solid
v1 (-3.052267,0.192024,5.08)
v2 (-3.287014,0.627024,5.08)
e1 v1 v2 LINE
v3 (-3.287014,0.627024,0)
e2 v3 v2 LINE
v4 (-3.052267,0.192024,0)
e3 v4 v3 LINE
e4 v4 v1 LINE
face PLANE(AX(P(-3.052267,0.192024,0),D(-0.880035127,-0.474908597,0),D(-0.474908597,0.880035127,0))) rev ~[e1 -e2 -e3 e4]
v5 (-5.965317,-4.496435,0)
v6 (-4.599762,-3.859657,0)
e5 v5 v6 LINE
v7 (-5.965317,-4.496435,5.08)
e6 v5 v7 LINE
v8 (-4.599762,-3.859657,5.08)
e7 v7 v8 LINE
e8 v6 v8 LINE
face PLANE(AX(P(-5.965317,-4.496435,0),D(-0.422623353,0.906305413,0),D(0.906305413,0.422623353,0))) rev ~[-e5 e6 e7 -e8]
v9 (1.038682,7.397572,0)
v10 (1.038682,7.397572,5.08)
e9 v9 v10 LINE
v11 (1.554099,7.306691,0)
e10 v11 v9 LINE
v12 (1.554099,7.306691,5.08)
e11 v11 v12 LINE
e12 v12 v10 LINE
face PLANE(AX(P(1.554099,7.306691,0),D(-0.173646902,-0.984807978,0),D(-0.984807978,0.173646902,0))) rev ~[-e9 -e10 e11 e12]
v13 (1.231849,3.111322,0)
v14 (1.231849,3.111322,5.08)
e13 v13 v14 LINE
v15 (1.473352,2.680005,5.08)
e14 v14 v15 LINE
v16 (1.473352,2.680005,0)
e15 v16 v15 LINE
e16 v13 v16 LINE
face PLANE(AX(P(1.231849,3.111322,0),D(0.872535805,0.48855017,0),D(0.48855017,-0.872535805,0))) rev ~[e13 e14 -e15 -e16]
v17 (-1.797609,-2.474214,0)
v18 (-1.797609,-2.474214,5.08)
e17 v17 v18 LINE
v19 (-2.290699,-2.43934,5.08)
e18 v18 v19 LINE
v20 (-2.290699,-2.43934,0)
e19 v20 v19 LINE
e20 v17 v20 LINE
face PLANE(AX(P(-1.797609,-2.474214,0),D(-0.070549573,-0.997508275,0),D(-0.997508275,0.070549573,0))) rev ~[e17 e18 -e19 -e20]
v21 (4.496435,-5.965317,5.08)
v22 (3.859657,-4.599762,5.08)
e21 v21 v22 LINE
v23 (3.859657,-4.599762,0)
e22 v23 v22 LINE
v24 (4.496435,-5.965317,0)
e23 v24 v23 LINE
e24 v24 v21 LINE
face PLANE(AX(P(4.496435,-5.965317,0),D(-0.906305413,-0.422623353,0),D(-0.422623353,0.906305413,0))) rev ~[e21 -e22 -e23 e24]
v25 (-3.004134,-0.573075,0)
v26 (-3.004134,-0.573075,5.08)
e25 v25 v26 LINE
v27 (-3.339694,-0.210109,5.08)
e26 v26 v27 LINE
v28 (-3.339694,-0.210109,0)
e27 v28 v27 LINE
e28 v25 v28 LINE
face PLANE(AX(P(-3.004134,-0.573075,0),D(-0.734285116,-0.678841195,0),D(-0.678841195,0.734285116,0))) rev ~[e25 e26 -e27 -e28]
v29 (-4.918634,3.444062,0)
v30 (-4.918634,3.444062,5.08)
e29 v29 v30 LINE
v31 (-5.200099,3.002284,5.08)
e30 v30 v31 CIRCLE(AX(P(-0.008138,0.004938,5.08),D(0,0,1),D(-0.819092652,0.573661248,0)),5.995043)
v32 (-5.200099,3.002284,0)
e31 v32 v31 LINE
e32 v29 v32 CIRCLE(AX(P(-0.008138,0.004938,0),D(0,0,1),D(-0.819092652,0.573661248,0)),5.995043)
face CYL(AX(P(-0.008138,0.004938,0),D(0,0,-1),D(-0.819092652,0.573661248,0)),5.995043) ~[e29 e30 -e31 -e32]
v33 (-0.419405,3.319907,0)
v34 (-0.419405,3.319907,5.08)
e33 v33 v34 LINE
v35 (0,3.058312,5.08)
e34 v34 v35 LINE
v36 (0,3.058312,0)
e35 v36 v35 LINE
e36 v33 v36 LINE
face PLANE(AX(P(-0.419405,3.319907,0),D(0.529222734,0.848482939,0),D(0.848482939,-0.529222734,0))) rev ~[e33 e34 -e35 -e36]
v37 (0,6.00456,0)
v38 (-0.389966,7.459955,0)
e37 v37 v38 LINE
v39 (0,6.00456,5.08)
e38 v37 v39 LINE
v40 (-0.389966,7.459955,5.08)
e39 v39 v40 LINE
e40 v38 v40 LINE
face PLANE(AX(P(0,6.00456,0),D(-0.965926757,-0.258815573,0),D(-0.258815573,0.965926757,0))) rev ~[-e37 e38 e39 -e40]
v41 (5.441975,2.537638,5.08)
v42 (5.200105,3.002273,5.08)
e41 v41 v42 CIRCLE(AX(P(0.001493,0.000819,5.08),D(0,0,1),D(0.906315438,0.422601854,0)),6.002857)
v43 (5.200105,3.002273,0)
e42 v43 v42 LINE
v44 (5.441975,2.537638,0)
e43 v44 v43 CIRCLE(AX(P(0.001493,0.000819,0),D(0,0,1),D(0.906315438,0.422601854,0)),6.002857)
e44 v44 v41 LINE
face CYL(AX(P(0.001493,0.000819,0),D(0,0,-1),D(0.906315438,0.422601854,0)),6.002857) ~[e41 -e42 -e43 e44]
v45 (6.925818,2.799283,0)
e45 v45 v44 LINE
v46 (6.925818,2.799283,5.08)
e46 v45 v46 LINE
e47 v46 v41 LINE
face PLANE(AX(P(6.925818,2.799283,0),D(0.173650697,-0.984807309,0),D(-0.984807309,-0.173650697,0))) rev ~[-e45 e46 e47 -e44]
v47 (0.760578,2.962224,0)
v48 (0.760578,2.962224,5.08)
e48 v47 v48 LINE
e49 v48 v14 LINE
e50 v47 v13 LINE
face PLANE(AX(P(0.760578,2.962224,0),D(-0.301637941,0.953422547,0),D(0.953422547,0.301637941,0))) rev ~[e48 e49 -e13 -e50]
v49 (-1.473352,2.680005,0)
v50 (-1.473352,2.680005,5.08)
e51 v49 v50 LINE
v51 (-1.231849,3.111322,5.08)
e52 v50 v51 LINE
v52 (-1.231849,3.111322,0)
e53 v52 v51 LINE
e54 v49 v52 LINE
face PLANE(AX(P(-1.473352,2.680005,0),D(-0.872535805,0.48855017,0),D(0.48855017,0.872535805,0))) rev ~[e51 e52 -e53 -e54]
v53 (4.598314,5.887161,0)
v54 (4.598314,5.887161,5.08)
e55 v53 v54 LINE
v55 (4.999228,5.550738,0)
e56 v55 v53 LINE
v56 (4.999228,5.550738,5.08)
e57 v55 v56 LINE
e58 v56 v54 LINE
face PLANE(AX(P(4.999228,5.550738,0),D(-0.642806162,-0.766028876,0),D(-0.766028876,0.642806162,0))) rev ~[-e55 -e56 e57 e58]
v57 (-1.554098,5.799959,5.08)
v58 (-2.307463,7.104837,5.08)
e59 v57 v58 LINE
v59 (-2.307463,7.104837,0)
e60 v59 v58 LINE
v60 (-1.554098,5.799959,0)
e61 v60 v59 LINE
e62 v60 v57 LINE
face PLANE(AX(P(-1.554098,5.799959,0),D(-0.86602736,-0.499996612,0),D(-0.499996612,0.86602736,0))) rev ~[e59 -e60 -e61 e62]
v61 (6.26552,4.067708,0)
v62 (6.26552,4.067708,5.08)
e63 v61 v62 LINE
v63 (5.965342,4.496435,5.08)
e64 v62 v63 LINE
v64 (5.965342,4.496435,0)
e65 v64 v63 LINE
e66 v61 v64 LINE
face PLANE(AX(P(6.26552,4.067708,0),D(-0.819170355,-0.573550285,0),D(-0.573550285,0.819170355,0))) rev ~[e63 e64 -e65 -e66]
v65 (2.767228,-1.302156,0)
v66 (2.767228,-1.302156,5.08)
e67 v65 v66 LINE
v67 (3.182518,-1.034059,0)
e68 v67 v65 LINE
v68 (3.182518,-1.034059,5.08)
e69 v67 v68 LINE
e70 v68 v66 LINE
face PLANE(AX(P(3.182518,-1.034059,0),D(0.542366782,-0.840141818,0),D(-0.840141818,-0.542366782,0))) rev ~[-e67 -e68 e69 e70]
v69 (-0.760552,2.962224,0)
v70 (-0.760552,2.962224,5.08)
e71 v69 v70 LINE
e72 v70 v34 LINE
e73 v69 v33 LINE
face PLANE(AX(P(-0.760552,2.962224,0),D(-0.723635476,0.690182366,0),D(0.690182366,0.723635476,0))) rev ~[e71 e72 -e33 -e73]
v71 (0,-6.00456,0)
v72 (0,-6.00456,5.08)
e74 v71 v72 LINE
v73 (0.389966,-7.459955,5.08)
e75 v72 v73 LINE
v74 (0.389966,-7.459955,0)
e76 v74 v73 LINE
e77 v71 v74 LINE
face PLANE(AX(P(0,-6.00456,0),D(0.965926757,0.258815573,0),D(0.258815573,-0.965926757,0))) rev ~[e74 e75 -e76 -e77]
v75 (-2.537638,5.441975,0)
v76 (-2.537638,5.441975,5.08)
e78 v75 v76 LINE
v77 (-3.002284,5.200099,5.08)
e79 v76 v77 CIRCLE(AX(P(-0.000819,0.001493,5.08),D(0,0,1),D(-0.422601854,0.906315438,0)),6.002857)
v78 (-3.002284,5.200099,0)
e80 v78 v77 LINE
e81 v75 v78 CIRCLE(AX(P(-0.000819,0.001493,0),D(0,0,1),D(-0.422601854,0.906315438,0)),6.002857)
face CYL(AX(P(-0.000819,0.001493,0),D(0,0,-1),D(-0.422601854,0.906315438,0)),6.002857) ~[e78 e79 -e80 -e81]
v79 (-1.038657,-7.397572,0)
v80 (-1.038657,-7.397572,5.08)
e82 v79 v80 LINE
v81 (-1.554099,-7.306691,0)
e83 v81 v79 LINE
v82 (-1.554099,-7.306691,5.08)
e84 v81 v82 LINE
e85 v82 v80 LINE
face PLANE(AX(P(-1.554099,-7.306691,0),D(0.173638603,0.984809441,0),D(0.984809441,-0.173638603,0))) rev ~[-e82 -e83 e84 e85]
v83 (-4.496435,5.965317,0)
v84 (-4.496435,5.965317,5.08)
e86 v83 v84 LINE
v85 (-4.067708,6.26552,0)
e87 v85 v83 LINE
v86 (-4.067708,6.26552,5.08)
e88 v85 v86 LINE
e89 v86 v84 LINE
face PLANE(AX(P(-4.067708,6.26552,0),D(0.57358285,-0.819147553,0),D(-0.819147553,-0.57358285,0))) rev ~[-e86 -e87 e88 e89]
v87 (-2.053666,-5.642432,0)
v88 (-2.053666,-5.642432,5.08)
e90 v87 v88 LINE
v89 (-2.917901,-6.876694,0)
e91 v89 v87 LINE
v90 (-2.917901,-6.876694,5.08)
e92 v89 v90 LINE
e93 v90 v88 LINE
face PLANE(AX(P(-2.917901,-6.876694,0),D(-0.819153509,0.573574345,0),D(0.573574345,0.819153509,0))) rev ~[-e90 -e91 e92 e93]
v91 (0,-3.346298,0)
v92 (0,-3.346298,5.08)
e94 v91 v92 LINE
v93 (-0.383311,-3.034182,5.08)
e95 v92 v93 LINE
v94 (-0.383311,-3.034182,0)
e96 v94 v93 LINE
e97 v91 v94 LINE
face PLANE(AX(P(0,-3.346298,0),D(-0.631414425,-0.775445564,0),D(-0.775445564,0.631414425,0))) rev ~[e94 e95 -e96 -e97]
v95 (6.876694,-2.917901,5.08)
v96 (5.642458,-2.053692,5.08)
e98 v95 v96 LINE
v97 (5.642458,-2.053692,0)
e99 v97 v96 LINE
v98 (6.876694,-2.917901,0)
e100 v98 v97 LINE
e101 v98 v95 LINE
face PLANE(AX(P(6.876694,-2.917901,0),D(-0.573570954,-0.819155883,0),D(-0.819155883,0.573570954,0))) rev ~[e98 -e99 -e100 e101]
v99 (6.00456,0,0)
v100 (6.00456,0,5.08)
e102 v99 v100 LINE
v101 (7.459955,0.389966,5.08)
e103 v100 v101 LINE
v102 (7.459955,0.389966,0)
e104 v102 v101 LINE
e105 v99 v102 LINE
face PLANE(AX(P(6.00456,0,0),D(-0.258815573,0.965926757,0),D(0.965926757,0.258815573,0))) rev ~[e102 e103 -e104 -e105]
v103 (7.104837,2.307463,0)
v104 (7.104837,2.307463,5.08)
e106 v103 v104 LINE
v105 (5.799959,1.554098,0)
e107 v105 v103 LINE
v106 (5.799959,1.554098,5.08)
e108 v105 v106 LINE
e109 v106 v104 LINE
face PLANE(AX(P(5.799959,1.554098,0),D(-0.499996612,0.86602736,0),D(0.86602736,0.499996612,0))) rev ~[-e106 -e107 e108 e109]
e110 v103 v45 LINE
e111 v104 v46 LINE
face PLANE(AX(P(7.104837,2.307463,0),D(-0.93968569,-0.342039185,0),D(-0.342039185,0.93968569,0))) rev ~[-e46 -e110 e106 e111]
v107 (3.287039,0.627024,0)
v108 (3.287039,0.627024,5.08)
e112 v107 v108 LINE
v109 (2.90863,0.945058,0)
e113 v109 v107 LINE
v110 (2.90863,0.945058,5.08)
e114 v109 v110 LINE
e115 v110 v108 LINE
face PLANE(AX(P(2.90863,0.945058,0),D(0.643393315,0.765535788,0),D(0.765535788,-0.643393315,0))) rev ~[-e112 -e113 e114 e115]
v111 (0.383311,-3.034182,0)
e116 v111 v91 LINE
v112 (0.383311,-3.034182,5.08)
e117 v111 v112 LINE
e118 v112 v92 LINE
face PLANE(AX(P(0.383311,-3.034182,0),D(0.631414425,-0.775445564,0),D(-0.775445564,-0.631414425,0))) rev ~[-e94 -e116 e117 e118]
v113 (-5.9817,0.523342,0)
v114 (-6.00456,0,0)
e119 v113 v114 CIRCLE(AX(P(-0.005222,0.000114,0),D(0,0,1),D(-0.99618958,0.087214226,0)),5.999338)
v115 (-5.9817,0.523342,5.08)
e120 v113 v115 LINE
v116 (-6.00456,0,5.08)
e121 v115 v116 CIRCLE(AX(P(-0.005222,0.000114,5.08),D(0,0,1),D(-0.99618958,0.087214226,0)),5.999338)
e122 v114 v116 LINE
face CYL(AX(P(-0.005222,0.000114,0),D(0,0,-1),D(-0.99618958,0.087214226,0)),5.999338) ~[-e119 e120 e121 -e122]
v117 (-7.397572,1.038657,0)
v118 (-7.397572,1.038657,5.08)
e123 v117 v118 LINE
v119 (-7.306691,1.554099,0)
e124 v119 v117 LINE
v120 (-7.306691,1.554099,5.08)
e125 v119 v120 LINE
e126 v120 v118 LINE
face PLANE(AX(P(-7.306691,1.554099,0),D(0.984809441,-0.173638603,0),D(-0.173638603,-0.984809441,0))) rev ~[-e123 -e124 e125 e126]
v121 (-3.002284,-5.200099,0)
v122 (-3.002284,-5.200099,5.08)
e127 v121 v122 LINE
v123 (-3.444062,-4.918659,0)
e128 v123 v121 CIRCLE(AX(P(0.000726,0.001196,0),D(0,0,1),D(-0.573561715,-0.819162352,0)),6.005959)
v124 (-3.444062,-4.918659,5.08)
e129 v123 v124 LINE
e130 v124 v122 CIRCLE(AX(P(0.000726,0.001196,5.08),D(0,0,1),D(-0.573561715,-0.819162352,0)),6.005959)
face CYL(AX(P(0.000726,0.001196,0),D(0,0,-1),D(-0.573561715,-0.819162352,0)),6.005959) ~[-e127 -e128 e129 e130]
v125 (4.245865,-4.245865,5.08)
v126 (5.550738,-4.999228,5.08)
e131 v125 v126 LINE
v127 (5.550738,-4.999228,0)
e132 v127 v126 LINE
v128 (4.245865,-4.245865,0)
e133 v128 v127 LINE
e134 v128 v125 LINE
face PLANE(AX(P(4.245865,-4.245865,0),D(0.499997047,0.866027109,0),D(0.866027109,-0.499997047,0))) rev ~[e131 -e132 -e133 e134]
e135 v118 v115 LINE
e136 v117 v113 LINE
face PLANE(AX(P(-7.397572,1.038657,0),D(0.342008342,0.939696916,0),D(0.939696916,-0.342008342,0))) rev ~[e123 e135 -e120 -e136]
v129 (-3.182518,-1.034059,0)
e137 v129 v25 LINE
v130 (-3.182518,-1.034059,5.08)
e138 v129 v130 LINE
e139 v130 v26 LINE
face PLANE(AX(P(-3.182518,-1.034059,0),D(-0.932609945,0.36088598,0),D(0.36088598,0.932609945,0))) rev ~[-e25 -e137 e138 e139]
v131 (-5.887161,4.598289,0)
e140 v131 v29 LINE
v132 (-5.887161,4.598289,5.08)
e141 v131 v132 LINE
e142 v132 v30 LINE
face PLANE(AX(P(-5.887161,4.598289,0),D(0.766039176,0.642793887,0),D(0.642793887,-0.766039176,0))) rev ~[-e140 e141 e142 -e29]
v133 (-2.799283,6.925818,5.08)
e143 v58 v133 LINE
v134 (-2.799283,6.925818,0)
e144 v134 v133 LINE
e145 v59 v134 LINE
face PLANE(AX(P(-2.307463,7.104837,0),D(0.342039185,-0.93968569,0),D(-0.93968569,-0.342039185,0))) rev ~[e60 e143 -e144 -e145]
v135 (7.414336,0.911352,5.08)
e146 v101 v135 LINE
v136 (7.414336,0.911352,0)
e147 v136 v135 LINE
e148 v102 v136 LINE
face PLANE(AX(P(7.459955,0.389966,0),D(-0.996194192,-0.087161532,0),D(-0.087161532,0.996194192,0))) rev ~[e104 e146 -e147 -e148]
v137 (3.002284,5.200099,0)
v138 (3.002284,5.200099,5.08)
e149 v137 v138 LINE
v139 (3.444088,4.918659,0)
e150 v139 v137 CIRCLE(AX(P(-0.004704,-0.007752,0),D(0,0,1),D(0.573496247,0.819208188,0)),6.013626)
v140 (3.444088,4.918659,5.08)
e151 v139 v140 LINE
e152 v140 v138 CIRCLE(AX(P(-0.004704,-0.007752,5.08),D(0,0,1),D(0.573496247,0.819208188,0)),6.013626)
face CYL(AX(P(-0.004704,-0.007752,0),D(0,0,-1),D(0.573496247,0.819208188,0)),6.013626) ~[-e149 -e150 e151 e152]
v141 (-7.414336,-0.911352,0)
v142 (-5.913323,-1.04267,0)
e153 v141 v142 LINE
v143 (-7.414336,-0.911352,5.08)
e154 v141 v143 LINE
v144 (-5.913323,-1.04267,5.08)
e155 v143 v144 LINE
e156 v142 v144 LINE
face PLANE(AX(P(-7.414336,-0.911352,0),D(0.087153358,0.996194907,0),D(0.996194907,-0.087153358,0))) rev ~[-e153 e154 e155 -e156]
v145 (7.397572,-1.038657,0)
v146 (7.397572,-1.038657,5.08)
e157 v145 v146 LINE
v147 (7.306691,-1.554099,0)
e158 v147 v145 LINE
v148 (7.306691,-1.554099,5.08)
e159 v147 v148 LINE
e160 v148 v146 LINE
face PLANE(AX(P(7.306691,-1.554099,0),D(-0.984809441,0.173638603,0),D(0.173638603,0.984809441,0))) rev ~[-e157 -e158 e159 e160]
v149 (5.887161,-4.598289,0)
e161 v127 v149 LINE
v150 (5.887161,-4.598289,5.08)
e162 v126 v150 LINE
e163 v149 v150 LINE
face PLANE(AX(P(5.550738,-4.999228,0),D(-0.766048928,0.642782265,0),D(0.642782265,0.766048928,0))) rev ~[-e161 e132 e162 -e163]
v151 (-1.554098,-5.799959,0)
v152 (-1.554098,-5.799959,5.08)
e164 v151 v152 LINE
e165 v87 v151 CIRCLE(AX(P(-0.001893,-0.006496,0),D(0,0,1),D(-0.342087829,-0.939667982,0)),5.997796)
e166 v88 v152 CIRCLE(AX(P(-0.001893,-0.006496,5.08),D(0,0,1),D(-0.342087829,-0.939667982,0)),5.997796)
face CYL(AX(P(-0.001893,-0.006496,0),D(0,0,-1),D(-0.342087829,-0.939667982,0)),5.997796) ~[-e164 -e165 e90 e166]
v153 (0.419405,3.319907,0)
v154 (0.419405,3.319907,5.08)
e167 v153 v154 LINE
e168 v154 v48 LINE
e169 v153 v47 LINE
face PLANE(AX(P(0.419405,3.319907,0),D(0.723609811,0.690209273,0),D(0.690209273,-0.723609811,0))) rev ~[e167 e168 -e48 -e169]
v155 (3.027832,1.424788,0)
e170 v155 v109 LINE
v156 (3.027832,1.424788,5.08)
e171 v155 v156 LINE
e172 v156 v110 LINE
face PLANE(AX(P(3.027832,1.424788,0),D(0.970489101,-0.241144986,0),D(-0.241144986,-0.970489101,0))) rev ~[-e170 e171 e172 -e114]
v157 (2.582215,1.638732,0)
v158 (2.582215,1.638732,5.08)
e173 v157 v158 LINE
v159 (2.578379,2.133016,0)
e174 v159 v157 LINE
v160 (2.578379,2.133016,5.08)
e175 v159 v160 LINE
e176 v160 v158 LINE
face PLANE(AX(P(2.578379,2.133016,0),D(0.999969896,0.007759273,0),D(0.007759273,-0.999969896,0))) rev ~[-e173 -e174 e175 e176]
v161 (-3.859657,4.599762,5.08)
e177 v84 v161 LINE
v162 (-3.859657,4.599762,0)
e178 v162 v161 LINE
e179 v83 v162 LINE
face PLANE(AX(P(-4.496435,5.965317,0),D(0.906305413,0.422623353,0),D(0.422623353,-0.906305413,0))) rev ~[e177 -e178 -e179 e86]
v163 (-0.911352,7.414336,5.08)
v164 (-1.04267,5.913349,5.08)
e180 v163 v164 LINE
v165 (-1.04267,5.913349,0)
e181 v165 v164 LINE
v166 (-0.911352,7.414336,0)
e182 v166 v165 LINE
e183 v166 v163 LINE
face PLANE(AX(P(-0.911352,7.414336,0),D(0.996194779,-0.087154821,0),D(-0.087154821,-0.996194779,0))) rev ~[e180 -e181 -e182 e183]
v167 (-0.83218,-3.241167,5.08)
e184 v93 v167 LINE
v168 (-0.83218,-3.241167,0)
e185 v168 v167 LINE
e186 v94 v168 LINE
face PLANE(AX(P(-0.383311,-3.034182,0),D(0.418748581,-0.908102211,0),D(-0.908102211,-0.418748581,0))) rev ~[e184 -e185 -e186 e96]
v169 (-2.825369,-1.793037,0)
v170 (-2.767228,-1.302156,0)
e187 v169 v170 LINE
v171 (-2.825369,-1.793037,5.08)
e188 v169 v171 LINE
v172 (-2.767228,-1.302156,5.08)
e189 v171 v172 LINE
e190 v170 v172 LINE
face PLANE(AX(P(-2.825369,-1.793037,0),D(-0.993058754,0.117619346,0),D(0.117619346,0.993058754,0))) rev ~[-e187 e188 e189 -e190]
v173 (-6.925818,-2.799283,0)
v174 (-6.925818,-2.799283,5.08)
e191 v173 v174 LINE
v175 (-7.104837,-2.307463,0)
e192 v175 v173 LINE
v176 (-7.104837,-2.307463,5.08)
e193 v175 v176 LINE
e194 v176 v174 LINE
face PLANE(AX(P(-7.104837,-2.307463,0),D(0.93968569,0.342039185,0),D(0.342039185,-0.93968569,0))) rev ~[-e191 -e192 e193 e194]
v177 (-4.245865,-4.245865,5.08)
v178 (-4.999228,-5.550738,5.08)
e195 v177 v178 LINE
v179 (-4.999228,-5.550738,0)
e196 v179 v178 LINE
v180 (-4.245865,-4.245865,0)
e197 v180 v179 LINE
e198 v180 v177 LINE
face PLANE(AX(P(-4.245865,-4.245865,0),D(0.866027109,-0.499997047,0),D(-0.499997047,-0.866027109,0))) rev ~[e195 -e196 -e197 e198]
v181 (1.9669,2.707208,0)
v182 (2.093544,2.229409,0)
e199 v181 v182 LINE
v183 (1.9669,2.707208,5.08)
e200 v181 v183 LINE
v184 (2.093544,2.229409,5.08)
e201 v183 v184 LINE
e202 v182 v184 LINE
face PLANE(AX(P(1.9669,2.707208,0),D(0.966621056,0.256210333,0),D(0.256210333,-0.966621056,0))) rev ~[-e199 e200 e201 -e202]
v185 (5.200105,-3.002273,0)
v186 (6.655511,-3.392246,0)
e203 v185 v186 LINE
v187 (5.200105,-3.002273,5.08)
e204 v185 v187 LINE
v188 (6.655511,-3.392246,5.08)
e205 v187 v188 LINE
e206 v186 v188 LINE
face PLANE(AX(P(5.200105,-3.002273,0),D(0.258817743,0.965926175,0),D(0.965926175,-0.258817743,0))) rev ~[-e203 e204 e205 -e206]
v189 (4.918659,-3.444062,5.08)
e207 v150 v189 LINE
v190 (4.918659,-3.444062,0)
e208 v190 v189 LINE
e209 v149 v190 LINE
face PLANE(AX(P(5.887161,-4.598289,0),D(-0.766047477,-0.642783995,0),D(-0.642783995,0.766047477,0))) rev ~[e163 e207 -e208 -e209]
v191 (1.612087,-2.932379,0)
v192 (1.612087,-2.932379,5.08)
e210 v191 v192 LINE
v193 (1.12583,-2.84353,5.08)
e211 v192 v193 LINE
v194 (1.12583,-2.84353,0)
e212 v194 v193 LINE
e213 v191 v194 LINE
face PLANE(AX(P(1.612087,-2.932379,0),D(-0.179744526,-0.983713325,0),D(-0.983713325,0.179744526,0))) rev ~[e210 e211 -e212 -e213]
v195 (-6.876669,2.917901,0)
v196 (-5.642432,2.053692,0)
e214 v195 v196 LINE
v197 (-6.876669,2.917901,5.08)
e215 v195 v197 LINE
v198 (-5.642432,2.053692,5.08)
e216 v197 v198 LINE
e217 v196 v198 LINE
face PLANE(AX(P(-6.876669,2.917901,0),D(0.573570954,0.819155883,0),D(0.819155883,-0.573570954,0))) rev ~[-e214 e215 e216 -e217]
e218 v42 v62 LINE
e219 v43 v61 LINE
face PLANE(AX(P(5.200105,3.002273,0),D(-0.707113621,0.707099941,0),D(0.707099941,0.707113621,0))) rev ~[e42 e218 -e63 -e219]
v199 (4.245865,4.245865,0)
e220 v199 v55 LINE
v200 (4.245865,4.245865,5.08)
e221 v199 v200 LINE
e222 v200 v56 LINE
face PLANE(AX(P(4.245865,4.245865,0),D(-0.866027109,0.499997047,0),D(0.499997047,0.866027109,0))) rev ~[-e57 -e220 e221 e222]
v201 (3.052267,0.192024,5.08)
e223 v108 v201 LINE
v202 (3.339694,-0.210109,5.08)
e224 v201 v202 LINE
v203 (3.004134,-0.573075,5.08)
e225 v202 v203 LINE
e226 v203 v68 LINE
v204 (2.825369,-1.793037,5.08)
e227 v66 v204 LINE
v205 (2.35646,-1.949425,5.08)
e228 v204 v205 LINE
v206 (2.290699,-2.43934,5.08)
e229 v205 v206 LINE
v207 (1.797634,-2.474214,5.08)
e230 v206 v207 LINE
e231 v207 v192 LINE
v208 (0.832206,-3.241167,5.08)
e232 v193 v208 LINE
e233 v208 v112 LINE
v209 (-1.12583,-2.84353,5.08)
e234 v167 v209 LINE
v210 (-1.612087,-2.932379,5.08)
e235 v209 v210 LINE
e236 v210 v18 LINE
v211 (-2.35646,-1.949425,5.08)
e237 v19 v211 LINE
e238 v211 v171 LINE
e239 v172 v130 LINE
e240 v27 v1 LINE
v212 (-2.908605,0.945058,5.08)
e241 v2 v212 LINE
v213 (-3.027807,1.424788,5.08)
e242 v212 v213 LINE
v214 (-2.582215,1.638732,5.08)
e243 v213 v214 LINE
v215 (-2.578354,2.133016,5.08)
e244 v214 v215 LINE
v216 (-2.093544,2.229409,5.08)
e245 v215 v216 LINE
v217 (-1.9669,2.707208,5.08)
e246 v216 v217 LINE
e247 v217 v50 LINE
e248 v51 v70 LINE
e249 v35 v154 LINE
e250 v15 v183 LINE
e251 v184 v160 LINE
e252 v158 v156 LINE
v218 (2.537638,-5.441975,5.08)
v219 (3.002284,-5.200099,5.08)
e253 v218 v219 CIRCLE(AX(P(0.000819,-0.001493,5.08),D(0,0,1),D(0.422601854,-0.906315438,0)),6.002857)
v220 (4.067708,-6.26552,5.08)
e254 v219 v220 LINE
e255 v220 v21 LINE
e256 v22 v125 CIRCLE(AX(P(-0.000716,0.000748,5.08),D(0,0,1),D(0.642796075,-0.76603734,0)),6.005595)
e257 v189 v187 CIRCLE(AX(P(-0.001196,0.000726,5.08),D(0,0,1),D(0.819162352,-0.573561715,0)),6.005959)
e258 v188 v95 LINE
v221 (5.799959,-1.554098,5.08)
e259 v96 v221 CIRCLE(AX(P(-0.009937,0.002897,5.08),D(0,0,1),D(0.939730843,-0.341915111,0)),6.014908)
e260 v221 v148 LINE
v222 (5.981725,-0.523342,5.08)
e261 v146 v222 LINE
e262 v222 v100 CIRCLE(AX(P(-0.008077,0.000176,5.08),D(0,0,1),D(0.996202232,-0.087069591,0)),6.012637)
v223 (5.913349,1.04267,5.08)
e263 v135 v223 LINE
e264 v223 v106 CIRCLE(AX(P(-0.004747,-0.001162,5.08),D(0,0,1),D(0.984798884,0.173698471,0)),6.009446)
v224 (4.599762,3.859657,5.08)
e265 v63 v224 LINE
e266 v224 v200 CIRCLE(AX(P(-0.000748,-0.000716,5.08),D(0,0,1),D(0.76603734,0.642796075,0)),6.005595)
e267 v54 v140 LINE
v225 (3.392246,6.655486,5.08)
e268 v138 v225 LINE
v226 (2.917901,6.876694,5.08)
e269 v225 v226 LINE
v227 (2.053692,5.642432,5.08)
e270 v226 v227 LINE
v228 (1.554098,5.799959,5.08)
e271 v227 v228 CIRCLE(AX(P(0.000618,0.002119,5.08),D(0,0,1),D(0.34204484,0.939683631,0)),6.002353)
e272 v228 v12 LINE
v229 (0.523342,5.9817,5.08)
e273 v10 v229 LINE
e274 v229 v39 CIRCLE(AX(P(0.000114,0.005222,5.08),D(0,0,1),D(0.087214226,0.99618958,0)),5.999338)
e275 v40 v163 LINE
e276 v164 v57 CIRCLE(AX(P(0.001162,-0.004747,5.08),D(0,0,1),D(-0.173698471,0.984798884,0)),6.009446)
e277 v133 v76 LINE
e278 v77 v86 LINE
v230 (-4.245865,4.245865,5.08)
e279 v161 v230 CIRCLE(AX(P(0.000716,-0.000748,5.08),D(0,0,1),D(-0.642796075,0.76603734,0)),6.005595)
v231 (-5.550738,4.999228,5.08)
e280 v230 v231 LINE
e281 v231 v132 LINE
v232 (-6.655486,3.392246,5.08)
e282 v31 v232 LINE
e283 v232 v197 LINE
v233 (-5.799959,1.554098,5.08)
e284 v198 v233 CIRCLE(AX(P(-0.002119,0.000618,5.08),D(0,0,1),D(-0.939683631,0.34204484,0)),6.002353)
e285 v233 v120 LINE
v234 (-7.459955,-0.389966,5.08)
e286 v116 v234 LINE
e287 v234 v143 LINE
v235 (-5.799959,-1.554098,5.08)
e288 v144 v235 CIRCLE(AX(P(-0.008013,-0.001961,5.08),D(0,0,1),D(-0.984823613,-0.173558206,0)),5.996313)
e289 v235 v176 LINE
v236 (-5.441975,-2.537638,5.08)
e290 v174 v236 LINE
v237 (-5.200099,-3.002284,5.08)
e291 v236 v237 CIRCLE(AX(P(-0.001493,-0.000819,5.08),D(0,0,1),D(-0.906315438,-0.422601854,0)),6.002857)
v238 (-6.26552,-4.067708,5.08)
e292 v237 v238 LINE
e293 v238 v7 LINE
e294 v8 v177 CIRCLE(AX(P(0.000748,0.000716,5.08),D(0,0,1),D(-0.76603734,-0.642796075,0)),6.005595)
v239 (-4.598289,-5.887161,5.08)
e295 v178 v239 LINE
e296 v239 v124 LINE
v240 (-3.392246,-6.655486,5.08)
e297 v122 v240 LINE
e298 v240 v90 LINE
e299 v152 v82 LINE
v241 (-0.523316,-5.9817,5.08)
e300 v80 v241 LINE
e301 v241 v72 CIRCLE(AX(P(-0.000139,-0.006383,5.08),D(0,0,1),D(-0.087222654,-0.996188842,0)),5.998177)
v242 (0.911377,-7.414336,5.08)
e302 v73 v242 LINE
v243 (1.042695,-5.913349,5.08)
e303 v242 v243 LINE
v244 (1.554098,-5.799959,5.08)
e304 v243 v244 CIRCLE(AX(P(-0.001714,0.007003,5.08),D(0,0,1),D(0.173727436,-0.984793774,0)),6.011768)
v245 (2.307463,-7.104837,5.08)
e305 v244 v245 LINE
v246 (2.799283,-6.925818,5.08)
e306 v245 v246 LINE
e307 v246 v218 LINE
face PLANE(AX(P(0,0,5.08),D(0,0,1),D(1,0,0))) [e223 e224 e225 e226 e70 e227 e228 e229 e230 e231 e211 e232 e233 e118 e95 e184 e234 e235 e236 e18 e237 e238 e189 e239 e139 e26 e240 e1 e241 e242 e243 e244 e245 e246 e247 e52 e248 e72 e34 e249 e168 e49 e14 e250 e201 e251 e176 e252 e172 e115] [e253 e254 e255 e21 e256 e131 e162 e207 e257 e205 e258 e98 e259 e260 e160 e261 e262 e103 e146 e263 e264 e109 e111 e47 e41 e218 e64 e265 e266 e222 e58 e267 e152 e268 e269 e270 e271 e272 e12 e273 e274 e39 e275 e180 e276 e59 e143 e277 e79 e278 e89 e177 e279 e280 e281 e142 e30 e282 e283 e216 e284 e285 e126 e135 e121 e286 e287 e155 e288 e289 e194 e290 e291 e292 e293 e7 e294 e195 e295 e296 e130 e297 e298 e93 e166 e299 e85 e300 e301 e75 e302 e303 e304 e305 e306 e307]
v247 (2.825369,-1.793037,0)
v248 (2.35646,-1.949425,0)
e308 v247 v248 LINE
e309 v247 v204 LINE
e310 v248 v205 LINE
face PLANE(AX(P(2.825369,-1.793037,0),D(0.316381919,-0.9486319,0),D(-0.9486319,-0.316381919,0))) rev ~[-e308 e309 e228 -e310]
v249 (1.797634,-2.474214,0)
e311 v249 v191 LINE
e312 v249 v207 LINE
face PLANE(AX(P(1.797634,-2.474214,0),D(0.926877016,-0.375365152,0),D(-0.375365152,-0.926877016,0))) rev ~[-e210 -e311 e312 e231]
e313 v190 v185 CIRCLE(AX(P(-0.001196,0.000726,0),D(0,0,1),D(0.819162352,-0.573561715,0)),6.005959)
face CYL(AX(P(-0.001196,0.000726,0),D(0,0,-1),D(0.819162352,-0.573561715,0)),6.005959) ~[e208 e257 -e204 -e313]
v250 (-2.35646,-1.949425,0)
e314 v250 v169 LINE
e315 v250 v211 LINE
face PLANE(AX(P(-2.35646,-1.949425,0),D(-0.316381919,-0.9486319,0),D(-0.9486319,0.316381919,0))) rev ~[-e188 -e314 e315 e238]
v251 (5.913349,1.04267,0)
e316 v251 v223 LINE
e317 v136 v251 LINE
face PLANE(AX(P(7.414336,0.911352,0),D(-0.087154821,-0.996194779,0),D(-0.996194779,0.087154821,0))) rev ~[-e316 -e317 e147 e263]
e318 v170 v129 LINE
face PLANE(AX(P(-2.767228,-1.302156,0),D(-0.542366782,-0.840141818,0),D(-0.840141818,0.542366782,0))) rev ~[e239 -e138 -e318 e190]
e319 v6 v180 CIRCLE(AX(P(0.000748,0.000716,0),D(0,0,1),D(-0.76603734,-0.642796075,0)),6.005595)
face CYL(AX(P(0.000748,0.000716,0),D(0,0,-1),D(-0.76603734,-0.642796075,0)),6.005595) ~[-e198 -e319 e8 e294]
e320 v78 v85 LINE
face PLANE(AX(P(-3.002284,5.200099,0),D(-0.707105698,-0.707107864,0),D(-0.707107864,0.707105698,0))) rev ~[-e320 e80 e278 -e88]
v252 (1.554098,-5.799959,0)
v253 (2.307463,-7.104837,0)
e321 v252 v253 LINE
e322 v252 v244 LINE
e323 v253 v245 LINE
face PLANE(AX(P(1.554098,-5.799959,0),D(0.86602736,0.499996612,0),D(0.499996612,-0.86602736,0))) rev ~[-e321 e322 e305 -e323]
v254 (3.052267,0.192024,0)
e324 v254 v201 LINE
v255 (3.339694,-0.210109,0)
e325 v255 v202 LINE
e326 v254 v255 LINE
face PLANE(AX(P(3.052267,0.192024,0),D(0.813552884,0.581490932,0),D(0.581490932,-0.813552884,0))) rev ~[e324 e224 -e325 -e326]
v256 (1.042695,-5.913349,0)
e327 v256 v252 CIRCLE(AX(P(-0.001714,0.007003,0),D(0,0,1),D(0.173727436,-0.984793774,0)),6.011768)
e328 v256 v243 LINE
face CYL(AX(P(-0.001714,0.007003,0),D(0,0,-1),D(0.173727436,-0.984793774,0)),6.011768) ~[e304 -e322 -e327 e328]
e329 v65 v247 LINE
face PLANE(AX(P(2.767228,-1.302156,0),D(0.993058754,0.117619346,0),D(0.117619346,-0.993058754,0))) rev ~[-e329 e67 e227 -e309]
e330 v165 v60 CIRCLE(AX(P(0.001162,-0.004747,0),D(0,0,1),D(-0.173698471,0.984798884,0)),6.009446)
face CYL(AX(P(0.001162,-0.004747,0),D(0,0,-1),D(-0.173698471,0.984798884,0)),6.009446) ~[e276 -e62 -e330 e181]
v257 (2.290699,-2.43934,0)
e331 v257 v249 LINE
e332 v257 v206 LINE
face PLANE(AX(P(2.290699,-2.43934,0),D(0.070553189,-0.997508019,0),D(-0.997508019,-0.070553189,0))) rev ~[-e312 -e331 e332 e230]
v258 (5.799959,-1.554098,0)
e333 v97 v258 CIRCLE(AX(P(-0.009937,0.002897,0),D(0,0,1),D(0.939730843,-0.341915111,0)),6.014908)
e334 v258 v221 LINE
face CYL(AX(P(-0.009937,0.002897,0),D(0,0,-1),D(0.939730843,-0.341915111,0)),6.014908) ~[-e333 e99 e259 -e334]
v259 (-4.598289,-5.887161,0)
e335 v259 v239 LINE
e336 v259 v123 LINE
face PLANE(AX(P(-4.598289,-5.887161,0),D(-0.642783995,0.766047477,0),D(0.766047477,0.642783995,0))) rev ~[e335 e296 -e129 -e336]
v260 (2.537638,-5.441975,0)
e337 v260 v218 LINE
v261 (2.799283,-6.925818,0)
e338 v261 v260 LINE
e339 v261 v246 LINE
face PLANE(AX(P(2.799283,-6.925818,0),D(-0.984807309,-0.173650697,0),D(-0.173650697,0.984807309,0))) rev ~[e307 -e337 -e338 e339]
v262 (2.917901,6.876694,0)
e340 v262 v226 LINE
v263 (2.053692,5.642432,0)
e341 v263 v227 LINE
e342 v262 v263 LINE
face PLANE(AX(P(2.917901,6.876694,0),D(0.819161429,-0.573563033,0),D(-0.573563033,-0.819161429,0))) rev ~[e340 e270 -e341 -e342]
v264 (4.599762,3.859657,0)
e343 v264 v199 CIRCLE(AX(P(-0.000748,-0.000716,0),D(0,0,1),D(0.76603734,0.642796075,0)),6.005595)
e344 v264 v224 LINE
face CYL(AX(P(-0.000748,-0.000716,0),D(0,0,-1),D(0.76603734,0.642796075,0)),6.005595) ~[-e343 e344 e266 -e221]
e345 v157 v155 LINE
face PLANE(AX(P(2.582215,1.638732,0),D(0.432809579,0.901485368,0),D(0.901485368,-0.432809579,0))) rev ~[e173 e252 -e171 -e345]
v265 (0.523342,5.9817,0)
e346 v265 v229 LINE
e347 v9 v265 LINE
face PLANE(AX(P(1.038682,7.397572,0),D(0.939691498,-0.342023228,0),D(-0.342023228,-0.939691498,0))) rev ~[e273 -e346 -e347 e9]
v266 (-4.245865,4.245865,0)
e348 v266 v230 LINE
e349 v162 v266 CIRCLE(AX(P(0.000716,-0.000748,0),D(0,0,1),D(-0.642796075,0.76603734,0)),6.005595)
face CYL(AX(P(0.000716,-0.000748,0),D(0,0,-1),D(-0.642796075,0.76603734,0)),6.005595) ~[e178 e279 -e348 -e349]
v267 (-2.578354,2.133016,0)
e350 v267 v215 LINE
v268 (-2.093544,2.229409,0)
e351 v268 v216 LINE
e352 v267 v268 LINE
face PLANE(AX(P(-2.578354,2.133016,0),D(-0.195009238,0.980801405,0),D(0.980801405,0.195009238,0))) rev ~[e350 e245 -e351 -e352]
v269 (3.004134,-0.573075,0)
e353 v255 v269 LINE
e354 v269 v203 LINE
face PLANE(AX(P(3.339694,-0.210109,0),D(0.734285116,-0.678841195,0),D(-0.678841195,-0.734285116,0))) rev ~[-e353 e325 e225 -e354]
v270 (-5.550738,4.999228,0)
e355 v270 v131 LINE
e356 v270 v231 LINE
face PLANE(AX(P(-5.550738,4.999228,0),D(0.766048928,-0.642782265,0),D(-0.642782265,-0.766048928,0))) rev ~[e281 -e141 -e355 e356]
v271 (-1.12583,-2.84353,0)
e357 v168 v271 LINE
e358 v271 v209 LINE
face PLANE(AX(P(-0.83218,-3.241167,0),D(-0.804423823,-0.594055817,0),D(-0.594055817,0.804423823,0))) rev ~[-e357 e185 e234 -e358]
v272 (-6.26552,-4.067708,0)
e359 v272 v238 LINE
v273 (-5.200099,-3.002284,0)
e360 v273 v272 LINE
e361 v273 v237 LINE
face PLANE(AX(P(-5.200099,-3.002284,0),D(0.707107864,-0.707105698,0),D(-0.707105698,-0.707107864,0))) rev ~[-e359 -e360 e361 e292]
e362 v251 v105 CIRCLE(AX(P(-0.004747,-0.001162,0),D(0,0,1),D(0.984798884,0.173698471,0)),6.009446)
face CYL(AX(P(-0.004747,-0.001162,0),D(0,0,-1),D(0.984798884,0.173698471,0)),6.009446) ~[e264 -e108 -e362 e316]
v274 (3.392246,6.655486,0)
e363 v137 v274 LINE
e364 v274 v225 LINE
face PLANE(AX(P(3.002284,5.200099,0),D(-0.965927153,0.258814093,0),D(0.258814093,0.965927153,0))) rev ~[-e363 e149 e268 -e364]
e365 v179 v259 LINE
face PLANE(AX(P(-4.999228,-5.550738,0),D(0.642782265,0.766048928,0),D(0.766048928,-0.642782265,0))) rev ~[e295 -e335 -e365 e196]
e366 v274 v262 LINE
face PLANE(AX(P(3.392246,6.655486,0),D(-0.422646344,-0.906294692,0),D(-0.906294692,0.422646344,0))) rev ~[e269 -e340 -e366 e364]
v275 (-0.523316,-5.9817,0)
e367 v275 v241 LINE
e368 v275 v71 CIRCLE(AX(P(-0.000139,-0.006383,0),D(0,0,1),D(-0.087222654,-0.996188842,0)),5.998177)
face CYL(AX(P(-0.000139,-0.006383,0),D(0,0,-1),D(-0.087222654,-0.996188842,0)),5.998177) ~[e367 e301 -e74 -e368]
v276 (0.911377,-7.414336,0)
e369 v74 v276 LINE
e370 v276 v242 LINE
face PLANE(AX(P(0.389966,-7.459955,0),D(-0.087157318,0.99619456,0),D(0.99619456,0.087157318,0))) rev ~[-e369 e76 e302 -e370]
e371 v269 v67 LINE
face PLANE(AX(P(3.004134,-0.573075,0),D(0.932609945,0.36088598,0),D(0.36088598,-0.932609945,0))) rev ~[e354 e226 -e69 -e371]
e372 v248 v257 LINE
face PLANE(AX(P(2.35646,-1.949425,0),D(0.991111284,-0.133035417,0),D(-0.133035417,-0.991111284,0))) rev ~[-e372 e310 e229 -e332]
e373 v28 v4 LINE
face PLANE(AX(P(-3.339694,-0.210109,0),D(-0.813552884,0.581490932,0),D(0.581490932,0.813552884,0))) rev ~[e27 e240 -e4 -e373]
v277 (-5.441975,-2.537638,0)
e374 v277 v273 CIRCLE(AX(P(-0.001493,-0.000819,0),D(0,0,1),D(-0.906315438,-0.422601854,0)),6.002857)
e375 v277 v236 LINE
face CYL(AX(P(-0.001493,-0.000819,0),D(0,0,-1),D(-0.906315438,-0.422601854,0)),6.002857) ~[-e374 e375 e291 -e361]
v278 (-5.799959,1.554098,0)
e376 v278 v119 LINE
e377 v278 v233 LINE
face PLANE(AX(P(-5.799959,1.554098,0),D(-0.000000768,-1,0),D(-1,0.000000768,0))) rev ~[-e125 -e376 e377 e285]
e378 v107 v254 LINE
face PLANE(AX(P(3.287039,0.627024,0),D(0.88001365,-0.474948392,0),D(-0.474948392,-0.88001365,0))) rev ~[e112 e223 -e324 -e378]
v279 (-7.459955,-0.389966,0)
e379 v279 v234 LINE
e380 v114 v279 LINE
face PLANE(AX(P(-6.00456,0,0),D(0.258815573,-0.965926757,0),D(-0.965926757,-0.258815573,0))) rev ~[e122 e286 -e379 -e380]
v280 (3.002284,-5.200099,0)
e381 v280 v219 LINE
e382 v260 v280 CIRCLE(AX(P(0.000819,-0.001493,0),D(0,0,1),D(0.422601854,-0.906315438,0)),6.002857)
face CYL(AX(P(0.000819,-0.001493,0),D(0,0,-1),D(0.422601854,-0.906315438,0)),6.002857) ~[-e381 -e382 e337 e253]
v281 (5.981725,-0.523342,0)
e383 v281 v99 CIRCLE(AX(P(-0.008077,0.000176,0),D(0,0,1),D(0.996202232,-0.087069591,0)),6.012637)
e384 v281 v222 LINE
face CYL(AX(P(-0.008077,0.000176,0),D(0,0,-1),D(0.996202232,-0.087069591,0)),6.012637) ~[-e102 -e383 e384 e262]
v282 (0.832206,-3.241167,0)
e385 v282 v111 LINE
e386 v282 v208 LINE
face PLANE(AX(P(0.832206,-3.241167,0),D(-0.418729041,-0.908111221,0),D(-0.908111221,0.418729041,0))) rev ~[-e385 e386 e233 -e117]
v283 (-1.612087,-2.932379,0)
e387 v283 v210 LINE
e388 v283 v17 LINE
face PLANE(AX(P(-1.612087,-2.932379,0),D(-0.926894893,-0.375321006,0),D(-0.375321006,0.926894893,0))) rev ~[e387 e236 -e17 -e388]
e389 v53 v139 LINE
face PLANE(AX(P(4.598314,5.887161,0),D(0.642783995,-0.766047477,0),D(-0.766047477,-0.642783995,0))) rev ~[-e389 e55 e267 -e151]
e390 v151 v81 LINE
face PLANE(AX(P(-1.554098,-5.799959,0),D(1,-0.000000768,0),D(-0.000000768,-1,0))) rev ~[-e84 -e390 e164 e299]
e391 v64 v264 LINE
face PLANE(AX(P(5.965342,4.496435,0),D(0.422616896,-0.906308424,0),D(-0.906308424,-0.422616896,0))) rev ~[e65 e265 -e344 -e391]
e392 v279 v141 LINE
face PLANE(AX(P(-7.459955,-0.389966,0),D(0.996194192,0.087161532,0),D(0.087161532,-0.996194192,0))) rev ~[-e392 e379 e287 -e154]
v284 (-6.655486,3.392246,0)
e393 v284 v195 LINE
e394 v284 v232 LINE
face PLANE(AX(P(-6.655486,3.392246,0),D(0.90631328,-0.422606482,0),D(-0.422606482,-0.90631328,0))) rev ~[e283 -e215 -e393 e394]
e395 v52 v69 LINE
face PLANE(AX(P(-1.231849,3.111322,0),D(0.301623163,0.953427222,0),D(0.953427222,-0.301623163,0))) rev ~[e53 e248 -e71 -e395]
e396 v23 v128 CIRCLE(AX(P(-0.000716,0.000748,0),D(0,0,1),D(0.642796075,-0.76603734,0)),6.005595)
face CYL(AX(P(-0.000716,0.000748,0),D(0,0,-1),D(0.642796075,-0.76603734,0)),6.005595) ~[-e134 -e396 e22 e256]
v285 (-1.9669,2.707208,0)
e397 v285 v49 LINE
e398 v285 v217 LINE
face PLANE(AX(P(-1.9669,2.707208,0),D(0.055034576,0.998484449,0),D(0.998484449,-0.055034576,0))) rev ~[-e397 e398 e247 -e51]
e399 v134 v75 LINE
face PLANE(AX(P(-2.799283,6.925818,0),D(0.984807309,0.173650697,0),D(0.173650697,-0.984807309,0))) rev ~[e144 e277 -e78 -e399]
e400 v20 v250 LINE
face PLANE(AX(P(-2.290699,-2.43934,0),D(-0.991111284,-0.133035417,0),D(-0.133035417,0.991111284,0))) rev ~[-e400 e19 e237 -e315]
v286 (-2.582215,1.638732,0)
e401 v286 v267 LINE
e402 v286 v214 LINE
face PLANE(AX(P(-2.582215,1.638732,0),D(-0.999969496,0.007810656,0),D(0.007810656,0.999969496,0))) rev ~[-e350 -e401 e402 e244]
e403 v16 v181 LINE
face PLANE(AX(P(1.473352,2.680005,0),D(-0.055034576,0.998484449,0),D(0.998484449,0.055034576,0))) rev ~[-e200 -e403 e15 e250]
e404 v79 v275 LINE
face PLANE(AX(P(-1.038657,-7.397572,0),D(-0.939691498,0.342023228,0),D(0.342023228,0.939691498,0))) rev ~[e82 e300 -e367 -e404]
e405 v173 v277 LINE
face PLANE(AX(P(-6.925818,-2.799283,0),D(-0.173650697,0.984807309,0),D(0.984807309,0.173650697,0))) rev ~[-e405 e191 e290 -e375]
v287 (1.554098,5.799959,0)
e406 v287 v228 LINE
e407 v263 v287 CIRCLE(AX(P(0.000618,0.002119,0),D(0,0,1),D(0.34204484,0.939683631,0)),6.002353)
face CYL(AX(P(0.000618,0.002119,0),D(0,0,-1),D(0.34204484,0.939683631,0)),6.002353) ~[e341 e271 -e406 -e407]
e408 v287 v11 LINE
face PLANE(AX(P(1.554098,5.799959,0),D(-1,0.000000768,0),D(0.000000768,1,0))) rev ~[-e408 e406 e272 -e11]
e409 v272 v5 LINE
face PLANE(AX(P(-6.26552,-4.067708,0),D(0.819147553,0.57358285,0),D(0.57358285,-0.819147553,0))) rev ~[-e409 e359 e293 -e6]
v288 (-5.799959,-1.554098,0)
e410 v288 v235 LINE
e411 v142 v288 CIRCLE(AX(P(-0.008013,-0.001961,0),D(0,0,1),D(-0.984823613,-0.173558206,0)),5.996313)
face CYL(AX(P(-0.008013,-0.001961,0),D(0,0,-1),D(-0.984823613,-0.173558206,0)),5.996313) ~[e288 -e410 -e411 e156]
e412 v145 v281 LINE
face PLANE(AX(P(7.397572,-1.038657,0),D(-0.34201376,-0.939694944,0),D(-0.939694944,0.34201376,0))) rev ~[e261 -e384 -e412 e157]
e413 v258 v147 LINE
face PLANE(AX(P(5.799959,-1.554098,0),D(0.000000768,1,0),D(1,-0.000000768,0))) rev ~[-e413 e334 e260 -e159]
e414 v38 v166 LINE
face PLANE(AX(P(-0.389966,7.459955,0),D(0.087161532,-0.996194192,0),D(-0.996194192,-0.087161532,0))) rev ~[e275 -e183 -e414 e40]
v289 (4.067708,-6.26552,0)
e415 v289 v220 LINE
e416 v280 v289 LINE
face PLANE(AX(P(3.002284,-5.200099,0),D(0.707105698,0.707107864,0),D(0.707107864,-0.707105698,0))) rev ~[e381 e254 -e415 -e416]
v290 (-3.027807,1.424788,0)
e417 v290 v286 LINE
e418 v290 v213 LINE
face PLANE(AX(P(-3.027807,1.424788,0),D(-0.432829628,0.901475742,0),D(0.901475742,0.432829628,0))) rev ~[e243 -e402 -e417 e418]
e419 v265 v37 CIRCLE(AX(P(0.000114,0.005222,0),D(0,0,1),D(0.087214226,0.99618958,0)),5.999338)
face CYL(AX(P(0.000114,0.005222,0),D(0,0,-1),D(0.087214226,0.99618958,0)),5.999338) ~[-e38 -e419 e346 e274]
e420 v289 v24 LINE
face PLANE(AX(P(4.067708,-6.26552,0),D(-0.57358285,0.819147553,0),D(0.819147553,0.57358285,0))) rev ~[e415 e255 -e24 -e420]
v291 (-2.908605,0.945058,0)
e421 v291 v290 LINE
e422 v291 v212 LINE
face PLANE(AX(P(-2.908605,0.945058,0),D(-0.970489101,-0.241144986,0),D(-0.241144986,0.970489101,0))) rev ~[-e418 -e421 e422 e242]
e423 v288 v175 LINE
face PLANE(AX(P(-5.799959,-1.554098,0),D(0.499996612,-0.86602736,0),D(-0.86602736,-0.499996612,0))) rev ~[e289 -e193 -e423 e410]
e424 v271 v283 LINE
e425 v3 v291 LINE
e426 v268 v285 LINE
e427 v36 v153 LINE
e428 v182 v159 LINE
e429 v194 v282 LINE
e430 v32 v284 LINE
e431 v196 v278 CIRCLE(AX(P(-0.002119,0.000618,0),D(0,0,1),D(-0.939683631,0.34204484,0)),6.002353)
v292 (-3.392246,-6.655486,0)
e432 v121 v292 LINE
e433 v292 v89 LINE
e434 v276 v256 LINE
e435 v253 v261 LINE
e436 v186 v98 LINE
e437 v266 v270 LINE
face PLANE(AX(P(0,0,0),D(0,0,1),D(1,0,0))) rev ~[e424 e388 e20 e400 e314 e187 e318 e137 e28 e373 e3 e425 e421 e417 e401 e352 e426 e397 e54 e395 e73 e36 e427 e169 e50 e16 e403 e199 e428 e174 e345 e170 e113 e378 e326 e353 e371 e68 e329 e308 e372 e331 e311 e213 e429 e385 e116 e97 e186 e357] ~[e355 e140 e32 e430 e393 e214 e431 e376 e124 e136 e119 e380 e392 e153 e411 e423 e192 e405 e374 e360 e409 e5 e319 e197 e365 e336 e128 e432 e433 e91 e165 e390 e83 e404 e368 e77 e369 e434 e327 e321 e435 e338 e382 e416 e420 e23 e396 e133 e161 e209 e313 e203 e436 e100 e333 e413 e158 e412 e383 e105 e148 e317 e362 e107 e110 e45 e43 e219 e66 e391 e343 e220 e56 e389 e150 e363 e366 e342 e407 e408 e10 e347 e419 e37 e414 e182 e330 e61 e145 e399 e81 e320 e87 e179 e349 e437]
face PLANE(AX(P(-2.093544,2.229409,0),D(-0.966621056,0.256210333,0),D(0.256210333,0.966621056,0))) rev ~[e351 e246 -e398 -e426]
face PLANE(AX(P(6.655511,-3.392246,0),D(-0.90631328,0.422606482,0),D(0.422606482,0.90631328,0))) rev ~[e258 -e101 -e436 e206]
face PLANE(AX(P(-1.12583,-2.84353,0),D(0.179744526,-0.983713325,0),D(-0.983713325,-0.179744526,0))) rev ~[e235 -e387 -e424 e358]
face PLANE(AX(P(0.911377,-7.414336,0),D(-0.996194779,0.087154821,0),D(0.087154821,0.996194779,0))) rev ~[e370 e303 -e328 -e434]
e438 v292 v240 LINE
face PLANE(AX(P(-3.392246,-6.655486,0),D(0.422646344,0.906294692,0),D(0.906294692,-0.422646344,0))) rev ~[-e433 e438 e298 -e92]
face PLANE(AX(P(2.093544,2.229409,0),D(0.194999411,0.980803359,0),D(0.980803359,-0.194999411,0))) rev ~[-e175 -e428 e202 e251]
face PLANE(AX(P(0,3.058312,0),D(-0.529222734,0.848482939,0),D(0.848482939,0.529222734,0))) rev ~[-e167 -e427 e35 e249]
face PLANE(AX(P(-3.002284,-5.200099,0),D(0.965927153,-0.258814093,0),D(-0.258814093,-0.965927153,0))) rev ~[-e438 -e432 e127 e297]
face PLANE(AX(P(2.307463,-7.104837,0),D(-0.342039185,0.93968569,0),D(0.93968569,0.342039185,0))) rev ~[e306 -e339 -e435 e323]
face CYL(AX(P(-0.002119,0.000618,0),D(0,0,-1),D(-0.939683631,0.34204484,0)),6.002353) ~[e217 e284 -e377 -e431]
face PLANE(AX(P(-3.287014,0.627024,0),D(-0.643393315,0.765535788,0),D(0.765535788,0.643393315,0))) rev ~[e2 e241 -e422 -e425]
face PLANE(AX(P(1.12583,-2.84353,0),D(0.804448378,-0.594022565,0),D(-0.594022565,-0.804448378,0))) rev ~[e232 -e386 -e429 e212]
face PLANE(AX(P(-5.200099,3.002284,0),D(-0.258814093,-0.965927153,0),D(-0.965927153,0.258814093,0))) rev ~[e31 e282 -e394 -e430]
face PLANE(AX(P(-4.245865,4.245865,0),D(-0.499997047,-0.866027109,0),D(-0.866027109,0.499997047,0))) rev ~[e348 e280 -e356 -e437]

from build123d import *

# Parameters (mm, degrees)
F1_DEPTH = 5.08


# Not quite as in the source:
# - ends of sketch curves that miss each other by under 0.0002 mm in the source are joined


with BuildPart() as f1:
    # F0 (on Top) → F1 (new body)
    with BuildSketch(Plane.XY):
        with BuildLine():
            Line((1.0386822, 7.3975722), (0.5233416, 5.9817))
            ThreePointArc((0.5233416, 5.9817), (0.261920534, 5.9988447577), (0, 6.00456))
            Line((0, 6.00456), (-0.3899662, 7.4599546))
            Line((-0.3899662, 7.4599546), (-0.911352, 7.4143362))
            Line((-0.911352, 7.4143362), (-1.04267, 5.9133486))
            ThreePointArc((-1.04267, 5.9133486), (-1.2996201412, 5.8622289517), (-1.5540978425, 5.79995868))
            Line((-1.5540978425, 5.79995868), (-2.307463, 7.1048372))
            Line((-2.307463, 7.1048372), (-2.7992832, 6.925818))
            Line((-2.7992832, 6.925818), (-2.5376378, 5.4419754))
            ThreePointArc((-2.5376378, 5.4419754), (-2.7726007409, 5.3261079528), (-3.0022844594, 5.2000989239))
            Line((-3.0022844594, 5.2000989239), (-4.0677084, 6.2655196))
            Line((-4.0677084, 6.2655196), (-4.496435, 5.965317))
            Line((-4.496435, 5.965317), (-3.859657, 4.5997622))
            ThreePointArc((-3.859657, 4.5997622), (-4.0566214385, 4.4270264624), (-4.245865094, 4.245865094))
            Line((-4.245865094, 4.245865094), (-5.5507382, 4.999228))
            Line((-5.5507382, 4.999228), (-5.8871612, 4.598289))
            Line((-5.8871612, 4.598289), (-4.9186338, 3.4440622))
            ThreePointArc((-4.9186338, 3.4440622), (-5.0641936548, 3.2262491255), (-5.2000989239, 3.0022844594))
            Line((-5.2000989239, 3.0022844594), (-6.6554858, 3.3922462))
            Line((-6.6554858, 3.3922462), (-6.876669, 2.9179012))
            Line((-6.876669, 2.9179012), (-5.6424322, 2.0536916))
            ThreePointArc((-5.6424322, 2.0536916), (-5.7266481207, 1.8056140494), (-5.79995868, 1.5540978425))
            Line((-5.79995868, 1.5540978425), (-7.306691, 1.554099))
            Line((-7.306691, 1.554099), (-7.3975722, 1.0386568))
            Line((-7.3975722, 1.0386568), (-5.9817, 0.5233416))
            ThreePointArc((-5.9817, 0.5233416), (-5.9988447577, 0.261920534), (-6.00456, 0))
            Line((-6.00456, 0), (-7.4599546, -0.3899662))
            Line((-7.4599546, -0.3899662), (-7.4143362, -0.911352))
            Line((-7.4143362, -0.911352), (-5.9133232, -1.04267))
            ThreePointArc((-5.9133232, -1.04267), (-5.8622284744, -1.2996222942), (-5.79995868, -1.5540978425))
            Line((-5.79995868, -1.5540978425), (-7.1048372, -2.307463))
            Line((-7.1048372, -2.307463), (-6.925818, -2.7992832))
            Line((-6.925818, -2.7992832), (-5.4419754, -2.5376378))
            ThreePointArc((-5.4419754, -2.5376378), (-5.3261079528, -2.7726007409), (-5.2000989239, -3.0022844594))
            Line((-5.2000989239, -3.0022844594), (-6.2655196, -4.0677084))
            Line((-6.2655196, -4.0677084), (-5.965317, -4.496435))
            Line((-5.965317, -4.496435), (-4.5997622, -3.859657))
            ThreePointArc((-4.5997622, -3.859657), (-4.4270264624, -4.0566214385), (-4.245865094, -4.245865094))
            Line((-4.245865094, -4.245865094), (-4.999228, -5.5507382))
            Line((-4.999228, -5.5507382), (-4.598289, -5.8871612))
            Line((-4.598289, -5.8871612), (-3.4440622, -4.9186592))
            ThreePointArc((-3.4440622, -4.9186592), (-3.2262429819, -5.0641975688), (-3.0022844594, -5.2000989239))
            Line((-3.0022844594, -5.2000989239), (-3.3922462, -6.6554858))
            Line((-3.3922462, -6.6554858), (-2.9179012, -6.8766944))
            Line((-2.9179012, -6.8766944), (-2.0536662, -5.6424322))
            ThreePointArc((-2.0536662, -5.6424322), (-1.8056026676, -5.7266517094), (-1.5540978425, -5.79995868))
            Line((-1.5540978425, -5.79995868), (-1.554099, -7.306691))
            Line((-1.554099, -7.306691), (-1.0386568, -7.3975722))
            Line((-1.0386568, -7.3975722), (-0.5233162, -5.9817))
            ThreePointArc((-0.5233162, -5.9817), (-0.2619078943, -5.9988453096), (0, -6.00456))
            Line((0, -6.00456), (0.3899662, -7.4599546))
            Line((0.3899662, -7.4599546), (0.9113774, -7.4143362))
            Line((0.9113774, -7.4143362), (1.0426954, -5.9133486))
            ThreePointArc((1.0426954, -5.9133486), (1.2996323518, -5.8622262447), (1.5540978425, -5.79995868))
            Line((1.5540978425, -5.79995868), (2.307463, -7.1048372))
            Line((2.307463, -7.1048372), (2.7992832, -6.925818))
            Line((2.7992832, -6.925818), (2.5376378, -5.4419754))
            ThreePointArc((2.5376378, -5.4419754), (2.7726007409, -5.3261079528), (3.0022844594, -5.2000989239))
            Line((3.0022844594, -5.2000989239), (4.0677084, -6.2655196))
            Line((4.0677084, -6.2655196), (4.496435, -5.965317))
            Line((4.496435, -5.965317), (3.859657, -4.5997622))
            ThreePointArc((3.859657, -4.5997622), (4.0566214385, -4.4270264624), (4.245865094, -4.245865094))
            Line((4.245865094, -4.245865094), (5.5507382, -4.999228))
            Line((5.5507382, -4.999228), (5.8871612, -4.598289))
            Line((5.8871612, -4.598289), (4.9186592, -3.4440622))
            ThreePointArc((4.9186592, -3.4440622), (5.0642009806, -3.2262376264), (5.2001052739, -3.0022734609))
            Line((5.2001052739, -3.0022734609), (6.6555112, -3.3922462))
            Line((6.6555112, -3.3922462), (6.8766944, -2.9179012))
            Line((6.8766944, -2.9179012), (5.6424576, -2.0536916))
            ThreePointArc((5.6424576, -2.0536916), (5.7266494269, -1.8056099067), (5.79995868, -1.5540978425))
            Line((5.79995868, -1.5540978425), (7.306691, -1.554099))
            Line((7.306691, -1.554099), (7.3975722, -1.0386568))
            Line((7.3975722, -1.0386568), (5.9817254, -0.5233416))
            ThreePointArc((5.9817254, -0.5233416), (5.998844806, -0.2619194281), (6.00456, 0))
            Line((6.00456, 0), (7.4599546, 0.3899662))
            Line((7.4599546, 0.3899662), (7.4143362, 0.911352))
            Line((7.4143362, 0.911352), (5.9133486, 1.04267))
            ThreePointArc((5.9133486, 1.04267), (5.8622289517, 1.2996201412), (5.79995868, 1.5540978425))
            Line((5.79995868, 1.5540978425), (7.1048372, 2.307463))
            Line((7.1048372, 2.307463), (6.925818, 2.7992832))
            Line((6.925818, 2.7992832), (5.4419754, 2.5376378))
            ThreePointArc((5.4419754, 2.5376378), (5.3261108849, 2.7725951084), (5.2001052739, 3.0022734609))
            Line((5.2001052739, 3.0022734609), (6.2655196, 4.0677084))
            Line((6.2655196, 4.0677084), (5.9653424, 4.496435))
            Line((5.9653424, 4.496435), (4.5997622, 3.859657))
            ThreePointArc((4.5997622, 3.859657), (4.4270264624, 4.0566214385), (4.245865094, 4.245865094))
            Line((4.245865094, 4.245865094), (4.999228, 5.5507382))
            Line((4.999228, 5.5507382), (4.5983144, 5.8871612))
            Line((4.5983144, 5.8871612), (3.4440876, 4.9186592))
            ThreePointArc((3.4440876, 4.9186592), (3.2262517559, 5.0641919791), (3.0022844594, 5.2000989239))
            Line((3.0022844594, 5.2000989239), (3.3922462, 6.6554858))
            Line((3.3922462, 6.6554858), (2.9179012, 6.8766944))
            Line((2.9179012, 6.8766944), (2.0536916, 5.6424322))
            ThreePointArc((2.0536916, 5.6424322), (1.8056140494, 5.7266481207), (1.5540978425, 5.79995868))
            Line((1.5540978425, 5.79995868), (1.554099, 7.306691))
            Line((1.554099, 7.306691), (1.0386822, 7.3975722))
        make_face()
        Polygon((-1.2318492, 3.1113222), (-0.7605522, 2.9622242), (-0.4194048, 3.319907), (0, 3.0583124), (0.4194048, 3.319907), (0.7605776, 2.9622242), (1.2318492, 3.1113222), (1.4733524, 2.6800048), (1.9668998, 2.7072082), (2.0935442, 2.2294088), (2.5783794, 2.1330158), (2.5822148, 1.6387318), (3.0278324, 1.4247876), (2.9086302, 0.9450578), (3.2870394, 0.6270244), (3.0522672, 0.192024), (3.3396936, -0.2101088), (3.0041342, -0.5730748), (3.1825184, -1.0340594), (2.7672284, -1.3021564), (2.825369, -1.7930368), (2.3564596, -1.9494246), (2.290699, -2.4393398), (1.7976342, -2.474214), (1.6120872, -2.9323792), (1.1258296, -2.84353), (0.8322056, -3.241167), (0.3833114, -3.0341824), (0, -3.3462976), (-0.3833114, -3.0341824), (-0.8321802, -3.241167), (-1.1258296, -2.84353), (-1.6120872, -2.9323792), (-1.7976088, -2.474214), (-2.290699, -2.4393398), (-2.3564596, -1.9494246), (-2.825369, -1.7930368), (-2.7672284, -1.3021564), (-3.1825184, -1.0340594), (-3.0041342, -0.5730748), (-3.3396936, -0.2101088), (-3.0522672, 0.192024), (-3.287014, 0.6270244), (-2.9086048, 0.9450578), (-3.027807, 1.4247876), (-2.5822148, 1.6387318), (-2.578354, 2.1330158), (-2.0935442, 2.2294088), (-1.9668998, 2.7072082), (-1.4733524, 2.6800048), align=None, mode=Mode.SUBTRACT)
    extrude(amount=F1_DEPTH)


solid = f1.part
